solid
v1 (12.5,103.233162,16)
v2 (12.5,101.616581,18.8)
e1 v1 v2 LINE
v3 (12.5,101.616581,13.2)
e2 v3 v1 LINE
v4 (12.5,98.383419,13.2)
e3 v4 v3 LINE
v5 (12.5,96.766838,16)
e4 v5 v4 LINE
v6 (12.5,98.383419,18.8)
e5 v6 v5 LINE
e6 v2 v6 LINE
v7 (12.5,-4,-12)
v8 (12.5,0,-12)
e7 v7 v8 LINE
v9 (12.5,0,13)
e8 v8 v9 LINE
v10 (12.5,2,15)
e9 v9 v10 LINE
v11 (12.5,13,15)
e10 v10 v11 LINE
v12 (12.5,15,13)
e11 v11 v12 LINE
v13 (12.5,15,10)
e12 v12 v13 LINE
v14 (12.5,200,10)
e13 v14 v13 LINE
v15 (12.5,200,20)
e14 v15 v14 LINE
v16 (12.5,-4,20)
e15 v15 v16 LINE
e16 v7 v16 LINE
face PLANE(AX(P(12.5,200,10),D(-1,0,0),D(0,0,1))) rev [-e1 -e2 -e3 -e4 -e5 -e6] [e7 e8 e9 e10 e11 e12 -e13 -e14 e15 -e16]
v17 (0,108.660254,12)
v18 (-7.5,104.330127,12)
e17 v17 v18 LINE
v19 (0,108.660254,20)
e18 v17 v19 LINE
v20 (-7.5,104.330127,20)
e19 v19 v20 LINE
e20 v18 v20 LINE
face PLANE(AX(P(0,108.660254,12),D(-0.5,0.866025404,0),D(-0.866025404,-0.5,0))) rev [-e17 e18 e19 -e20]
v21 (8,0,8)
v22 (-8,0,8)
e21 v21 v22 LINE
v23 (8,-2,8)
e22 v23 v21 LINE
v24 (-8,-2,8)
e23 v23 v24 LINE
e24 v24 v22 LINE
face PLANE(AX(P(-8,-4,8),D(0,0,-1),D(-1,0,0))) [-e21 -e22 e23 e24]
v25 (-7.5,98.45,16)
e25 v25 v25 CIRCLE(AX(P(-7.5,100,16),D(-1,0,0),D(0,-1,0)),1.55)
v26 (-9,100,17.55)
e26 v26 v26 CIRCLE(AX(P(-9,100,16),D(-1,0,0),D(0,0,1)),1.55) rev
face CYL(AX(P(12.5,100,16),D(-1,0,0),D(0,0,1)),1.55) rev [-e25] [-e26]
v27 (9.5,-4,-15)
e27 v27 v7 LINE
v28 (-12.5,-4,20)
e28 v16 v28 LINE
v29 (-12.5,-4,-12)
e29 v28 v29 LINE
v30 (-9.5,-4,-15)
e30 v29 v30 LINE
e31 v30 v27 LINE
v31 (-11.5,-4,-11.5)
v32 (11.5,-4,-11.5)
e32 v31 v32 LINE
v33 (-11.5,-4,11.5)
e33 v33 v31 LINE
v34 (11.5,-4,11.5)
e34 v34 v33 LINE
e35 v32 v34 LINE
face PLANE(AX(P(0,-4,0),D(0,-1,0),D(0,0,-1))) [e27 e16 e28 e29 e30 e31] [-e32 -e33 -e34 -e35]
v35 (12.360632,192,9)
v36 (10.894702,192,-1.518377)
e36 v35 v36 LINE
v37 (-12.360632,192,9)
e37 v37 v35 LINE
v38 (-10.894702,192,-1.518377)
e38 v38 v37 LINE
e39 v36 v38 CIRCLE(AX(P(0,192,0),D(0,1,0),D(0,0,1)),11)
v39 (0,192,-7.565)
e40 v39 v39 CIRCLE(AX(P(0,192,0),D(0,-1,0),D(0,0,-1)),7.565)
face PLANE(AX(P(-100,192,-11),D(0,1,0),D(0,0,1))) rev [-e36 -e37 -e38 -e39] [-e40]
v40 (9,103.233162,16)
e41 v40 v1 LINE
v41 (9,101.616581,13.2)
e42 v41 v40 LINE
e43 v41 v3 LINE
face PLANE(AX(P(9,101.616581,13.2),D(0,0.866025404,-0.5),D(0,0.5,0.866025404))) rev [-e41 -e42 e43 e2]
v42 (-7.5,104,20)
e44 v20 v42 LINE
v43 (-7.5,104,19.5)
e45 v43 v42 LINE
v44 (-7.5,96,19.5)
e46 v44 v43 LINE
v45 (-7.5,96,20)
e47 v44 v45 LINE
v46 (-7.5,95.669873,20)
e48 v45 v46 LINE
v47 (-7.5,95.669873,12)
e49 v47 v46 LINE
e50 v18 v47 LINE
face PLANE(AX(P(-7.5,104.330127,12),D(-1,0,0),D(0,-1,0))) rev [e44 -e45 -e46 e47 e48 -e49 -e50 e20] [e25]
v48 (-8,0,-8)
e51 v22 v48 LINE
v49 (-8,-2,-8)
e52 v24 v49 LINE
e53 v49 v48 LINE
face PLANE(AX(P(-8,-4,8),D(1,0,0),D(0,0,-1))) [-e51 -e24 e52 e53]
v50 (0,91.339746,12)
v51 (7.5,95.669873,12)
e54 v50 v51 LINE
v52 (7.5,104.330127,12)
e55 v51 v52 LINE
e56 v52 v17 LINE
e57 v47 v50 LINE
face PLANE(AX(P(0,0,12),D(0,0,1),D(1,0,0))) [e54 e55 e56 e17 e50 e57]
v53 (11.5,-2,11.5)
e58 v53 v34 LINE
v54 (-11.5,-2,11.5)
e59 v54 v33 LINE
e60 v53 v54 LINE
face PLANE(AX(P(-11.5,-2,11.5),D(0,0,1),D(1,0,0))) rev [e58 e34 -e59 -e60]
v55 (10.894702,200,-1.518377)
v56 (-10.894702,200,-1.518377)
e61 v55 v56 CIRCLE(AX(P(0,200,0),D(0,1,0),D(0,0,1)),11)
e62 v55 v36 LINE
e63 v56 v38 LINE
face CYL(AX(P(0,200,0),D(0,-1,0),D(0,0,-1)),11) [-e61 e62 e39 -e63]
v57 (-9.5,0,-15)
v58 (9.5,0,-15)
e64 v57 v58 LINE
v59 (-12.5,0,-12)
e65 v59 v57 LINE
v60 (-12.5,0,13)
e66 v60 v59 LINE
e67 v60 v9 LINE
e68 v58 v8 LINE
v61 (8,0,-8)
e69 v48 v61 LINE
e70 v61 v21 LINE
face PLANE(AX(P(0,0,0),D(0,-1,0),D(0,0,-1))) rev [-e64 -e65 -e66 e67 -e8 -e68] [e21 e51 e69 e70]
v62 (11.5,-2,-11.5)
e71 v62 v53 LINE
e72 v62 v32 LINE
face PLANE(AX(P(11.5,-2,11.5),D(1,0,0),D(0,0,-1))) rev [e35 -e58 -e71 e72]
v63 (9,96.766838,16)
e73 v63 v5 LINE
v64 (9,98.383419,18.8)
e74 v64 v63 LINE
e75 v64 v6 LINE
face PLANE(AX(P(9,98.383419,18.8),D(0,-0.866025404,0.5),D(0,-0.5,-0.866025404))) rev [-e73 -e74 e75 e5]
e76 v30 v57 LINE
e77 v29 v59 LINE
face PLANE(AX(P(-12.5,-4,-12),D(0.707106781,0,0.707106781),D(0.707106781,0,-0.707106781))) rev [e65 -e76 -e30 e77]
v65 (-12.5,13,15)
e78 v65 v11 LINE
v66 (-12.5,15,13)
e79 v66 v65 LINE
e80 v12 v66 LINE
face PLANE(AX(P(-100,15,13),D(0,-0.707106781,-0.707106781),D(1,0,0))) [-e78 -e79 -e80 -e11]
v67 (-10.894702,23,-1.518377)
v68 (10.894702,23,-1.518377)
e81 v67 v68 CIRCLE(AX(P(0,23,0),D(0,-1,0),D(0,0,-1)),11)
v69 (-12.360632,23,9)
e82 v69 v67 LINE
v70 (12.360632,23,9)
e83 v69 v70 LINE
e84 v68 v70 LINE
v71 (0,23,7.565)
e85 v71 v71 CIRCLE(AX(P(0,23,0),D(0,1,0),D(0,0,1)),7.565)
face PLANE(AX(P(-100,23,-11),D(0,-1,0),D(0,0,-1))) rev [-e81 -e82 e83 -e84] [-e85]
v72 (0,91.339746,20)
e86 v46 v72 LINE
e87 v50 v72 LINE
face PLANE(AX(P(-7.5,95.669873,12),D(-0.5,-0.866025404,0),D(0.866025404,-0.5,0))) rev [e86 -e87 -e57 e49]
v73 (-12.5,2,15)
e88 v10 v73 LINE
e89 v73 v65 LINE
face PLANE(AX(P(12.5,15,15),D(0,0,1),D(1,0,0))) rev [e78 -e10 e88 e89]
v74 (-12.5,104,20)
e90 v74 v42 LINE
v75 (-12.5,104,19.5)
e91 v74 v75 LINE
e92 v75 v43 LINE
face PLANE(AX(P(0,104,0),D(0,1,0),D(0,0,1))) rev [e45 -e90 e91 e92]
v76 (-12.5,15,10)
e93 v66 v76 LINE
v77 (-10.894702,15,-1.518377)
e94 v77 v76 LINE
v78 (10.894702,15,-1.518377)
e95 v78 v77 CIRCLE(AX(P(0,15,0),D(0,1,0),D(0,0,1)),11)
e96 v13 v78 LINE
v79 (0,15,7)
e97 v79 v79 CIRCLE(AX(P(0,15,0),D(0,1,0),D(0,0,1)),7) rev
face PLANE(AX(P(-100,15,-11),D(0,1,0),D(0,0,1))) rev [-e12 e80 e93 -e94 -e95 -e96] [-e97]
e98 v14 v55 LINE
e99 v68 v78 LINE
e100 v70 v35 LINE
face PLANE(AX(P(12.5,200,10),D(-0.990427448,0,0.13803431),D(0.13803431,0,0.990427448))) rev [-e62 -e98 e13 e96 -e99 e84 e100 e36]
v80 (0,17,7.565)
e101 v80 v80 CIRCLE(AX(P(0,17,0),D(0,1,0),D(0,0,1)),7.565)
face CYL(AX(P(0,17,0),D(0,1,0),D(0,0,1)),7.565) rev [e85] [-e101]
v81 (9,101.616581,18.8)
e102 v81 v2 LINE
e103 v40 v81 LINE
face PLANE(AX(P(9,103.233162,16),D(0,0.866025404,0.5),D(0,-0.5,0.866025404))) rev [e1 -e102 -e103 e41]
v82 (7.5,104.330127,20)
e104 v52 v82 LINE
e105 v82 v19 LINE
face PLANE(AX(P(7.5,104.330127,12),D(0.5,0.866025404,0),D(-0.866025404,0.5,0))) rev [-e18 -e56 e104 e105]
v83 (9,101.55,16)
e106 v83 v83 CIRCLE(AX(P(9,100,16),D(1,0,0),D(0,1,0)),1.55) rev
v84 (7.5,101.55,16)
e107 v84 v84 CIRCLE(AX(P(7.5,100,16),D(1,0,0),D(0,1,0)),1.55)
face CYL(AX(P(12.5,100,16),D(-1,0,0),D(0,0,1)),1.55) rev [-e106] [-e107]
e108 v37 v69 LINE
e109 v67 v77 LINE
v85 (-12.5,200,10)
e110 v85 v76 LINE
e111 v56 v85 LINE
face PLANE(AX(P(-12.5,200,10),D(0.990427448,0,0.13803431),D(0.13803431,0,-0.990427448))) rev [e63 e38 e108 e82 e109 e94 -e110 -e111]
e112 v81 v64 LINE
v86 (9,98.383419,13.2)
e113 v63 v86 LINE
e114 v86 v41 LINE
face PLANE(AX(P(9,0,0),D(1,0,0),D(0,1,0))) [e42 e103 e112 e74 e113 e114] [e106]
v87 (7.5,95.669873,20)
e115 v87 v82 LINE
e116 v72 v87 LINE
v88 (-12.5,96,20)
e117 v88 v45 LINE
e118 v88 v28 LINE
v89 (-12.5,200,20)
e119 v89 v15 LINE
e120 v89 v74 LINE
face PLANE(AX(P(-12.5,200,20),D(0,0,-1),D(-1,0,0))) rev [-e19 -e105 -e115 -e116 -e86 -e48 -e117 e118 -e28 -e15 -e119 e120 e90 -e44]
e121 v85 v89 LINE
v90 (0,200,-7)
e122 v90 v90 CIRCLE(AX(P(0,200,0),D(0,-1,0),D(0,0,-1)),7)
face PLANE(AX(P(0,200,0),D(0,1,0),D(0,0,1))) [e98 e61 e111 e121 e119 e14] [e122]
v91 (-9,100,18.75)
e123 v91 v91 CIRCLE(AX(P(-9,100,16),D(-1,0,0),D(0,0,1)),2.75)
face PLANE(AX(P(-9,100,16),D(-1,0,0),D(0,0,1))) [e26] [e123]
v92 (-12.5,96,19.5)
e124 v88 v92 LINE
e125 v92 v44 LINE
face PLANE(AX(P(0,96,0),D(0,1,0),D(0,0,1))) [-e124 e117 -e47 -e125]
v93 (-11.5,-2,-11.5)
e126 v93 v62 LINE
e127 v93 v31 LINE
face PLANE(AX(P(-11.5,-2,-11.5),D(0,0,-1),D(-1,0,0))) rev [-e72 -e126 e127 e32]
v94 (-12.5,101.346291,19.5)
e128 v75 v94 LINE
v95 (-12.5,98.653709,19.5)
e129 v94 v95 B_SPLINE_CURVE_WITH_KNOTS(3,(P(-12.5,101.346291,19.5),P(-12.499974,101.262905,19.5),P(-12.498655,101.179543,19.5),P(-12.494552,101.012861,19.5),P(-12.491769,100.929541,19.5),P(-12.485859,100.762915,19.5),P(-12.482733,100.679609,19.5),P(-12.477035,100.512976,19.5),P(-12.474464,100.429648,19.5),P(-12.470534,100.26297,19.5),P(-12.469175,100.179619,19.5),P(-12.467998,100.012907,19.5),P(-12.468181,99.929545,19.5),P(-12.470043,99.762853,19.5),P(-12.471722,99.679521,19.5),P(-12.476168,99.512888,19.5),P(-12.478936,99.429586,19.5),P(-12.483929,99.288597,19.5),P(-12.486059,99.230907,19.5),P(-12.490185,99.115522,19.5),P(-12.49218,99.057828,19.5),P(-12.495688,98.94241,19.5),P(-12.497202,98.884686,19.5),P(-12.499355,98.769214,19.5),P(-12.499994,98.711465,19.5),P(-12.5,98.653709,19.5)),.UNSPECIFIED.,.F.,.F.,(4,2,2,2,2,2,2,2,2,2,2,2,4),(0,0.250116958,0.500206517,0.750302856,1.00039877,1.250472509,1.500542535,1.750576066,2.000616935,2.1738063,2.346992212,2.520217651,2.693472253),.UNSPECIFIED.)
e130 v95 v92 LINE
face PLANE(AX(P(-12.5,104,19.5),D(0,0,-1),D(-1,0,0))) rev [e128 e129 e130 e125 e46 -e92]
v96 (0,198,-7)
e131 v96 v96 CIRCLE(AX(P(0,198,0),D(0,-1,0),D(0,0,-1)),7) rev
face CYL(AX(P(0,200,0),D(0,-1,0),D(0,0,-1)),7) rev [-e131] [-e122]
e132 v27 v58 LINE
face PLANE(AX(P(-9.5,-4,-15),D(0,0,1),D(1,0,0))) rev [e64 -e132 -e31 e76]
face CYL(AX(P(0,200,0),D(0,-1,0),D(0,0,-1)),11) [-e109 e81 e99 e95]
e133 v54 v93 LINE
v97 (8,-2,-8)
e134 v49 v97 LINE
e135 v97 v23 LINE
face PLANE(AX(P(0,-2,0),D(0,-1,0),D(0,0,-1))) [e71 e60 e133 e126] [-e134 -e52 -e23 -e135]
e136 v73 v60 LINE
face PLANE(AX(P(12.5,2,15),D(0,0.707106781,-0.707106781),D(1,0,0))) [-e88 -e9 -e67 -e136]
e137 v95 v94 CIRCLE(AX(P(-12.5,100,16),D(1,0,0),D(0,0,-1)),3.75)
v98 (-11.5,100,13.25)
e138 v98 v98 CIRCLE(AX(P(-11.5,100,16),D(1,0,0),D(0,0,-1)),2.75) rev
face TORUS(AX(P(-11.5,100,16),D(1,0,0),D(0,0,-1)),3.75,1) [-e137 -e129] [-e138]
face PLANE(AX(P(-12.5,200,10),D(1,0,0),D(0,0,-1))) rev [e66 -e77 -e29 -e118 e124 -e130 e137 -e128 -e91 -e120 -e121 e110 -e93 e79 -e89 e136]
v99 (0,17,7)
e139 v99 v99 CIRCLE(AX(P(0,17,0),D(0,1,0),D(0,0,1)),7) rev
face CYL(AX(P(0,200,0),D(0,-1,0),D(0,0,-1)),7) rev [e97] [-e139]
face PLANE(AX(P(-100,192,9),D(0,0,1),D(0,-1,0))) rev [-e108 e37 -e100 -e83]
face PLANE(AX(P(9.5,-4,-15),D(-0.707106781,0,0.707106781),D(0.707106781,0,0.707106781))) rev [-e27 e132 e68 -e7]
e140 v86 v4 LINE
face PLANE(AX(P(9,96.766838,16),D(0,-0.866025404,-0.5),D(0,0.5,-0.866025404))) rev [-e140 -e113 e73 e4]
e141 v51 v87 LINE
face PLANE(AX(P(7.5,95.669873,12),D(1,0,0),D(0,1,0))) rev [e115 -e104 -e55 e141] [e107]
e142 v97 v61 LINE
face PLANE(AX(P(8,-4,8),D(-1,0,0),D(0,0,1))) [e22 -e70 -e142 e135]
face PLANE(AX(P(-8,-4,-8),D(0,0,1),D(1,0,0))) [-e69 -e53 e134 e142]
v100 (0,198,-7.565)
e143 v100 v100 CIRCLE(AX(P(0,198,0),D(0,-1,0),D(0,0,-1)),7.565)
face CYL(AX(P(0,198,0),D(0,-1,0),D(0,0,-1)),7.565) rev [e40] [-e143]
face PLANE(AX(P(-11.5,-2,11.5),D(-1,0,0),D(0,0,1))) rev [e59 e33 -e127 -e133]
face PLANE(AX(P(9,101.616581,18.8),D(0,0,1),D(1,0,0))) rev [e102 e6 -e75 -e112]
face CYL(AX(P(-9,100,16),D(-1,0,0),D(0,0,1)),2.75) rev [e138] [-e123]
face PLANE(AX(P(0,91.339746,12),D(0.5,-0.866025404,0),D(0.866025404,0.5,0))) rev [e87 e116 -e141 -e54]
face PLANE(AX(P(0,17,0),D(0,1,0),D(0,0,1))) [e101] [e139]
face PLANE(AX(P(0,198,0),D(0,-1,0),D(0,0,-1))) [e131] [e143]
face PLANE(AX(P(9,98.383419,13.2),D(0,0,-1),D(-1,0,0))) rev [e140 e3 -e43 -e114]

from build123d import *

# Parameters (mm, degrees)
BOSS_EXTRUDE1_DEPTH = 200
SKETCH4_R           = 7
CUT_EXTRUDE2_DEPTH  = 200
SKETCH3_W           = 20
SKETCH3_H           = 169
SKETCH3_W_2         = 21
SKETCH3_H_2         = 15
CUT_EXTRUDE1_DEPTH  = 100
SKETCH5_R           = 7.565
CUT_EXTRUDE3_DEPTH  = 6
CUT_EXTRUDE4_START  = -6
SKETCH6_R           = 7.565
CUT_EXTRUDE4_DEPTH  = 6
CUT_EXTRUDE8_START  = -100
SKETCH11_W          = 7
SKETCH11_H          = 2
CUT_EXTRUDE8_DEPTH  = 4
SKETCH13_W          = 16
SKETCH13_H          = 16
BOSS_EXTRUDE3_DEPTH = 4
SKETCH14_W          = 5
SKETCH14_H          = 15
CUT_EXTRUDE11_DEPTH = 203.546291005
CHAMFER1_SIZE       = 2
SKETCH15_W          = 23
SKETCH15_H          = 23
CUT_EXTRUDE12_DEPTH = 2
CUT_EXTRUDE13_DEPTH = 8
SKETCH17_R          = 1.55
CUT_EXTRUDE14_DEPTH = 203.546291005
SKETCH18_R          = 2.75
CUT_EXTRUDE15_DEPTH = 3.5
CUT_EXTRUDE16_DEPTH = 3.5
FILLET2_R           = 1


with BuildPart() as part:
    # Sketch1 → Boss-Extrude1 (new body)
    with BuildSketch(Plane(origin=(0, 0, 0), x_dir=(1, 0, 0), z_dir=(0, 1, 0))):
        with BuildLine():
            Line((-12.5, -10), (-10.894701926, 1.518377407))
            ThreePointArc((-10.894701926, 1.518377407), (0, 11), (10.894701926, 1.518377407))
            Line((10.894701926, 1.518377407), (12.5, -10))
            Line((12.5, -10), (12.5, -20))
            Line((12.5, -20), (-12.5, -20))
            Line((-12.5, -20), (-12.5, -10))
        make_face()
    extrude(amount=BOSS_EXTRUDE1_DEPTH)

    # Sketch4 → Cut-Extrude2 (cut)
    with BuildSketch(Plane.XZ):
        with Locations(Location((0, 0, 0), (0, 0, 270))):
            Circle(SKETCH4_R)
    extrude(amount=-CUT_EXTRUDE2_DEPTH, mode=Mode.SUBTRACT)

    # Sketch3 → Cut-Extrude1 (cut, symmetric)
    with BuildSketch(Plane(origin=(0, 0, 0), x_dir=(0, 0, -1), z_dir=(1, 0, 0))):
        with Locations((1, 107.5)):
            Rectangle(SKETCH3_W, SKETCH3_H)
        with Locations((0.5, 7.5)):
            Rectangle(SKETCH3_W_2, SKETCH3_H_2)
    extrude(amount=CUT_EXTRUDE1_DEPTH, both=True, mode=Mode.SUBTRACT)

    # Sketch5 → Cut-Extrude3 (cut)
    with BuildSketch(Plane.XZ.offset(-192)):
        with Locations(Location((0, 0, 0), (0, 0, 270))):
            Circle(SKETCH5_R)
    extrude(amount=-CUT_EXTRUDE3_DEPTH, mode=Mode.SUBTRACT)

    # Sketch6 → Cut-Extrude4 (cut)
    with BuildSketch(Plane(origin=(0, 23, 0), x_dir=(1, 0, 0), z_dir=(0, 1, 0)).offset(CUT_EXTRUDE4_START)):
        with Locations(Location((0, 0, 0), (0, 0, 90))):
            Circle(SKETCH6_R)
    extrude(amount=CUT_EXTRUDE4_DEPTH, mode=Mode.SUBTRACT)

    # Sketch11 → Cut-Extrude8 (cut, symmetric)
    with BuildSketch(Plane.XZ.offset(CUT_EXTRUDE8_START)):
        with Locations((-9, 20.5)):
            Rectangle(SKETCH11_W, SKETCH11_H)
    extrude(amount=CUT_EXTRUDE8_DEPTH, both=True, mode=Mode.SUBTRACT)

    # Sketch13 → Boss-Extrude3 (add)
    with BuildSketch(Plane.XZ):
        Polygon((-12.5, 20), (12.5, 20), (12.5, -12), (9.5, -15), (-9.5, -15), (-12.5, -12), align=None)
        Rectangle(SKETCH13_W, SKETCH13_H, mode=Mode.SUBTRACT)
    extrude(amount=BOSS_EXTRUDE3_DEPTH)

    # Sketch14 → Cut-Extrude11 (cut, through all)
    with BuildSketch(Plane.ZY.offset(12.5)):
        with Locations((12.5, 7.5)):
            Rectangle(SKETCH14_W, SKETCH14_H)
    extrude(amount=-CUT_EXTRUDE11_DEPTH, mode=Mode.SUBTRACT)

    # Chamfer1
    chamfer1_edges = [part.edges().sort_by_distance(p)[0] for p in [
        (0, 15, 15),
        (0, 0, 15),
    ]]
    chamfer(chamfer1_edges, length=CHAMFER1_SIZE)

    # Sketch15 → Cut-Extrude12 (cut)
    with BuildSketch(Plane.XZ.offset(4)):
        Rectangle(SKETCH15_W, SKETCH15_H)
    extrude(amount=-CUT_EXTRUDE12_DEPTH, mode=Mode.SUBTRACT)

    # Sketch16 → Cut-Extrude13 (cut)
    with BuildSketch(Plane.XY.offset(20)):
        Polygon((0, 108.660254038), (-7.5, 104.330127019), (-7.5, 95.669872981), (0, 91.339745962), (7.5, 95.669872981), (7.5, 104.330127019), align=None)
    extrude(amount=-CUT_EXTRUDE13_DEPTH, mode=Mode.SUBTRACT)

    # Sketch17 → Cut-Extrude14 (cut, through all)
    with BuildSketch(Plane.ZY.offset(12.5)):
        with Locations((16, 100)):
            Circle(SKETCH17_R)
    extrude(amount=-CUT_EXTRUDE14_DEPTH, mode=Mode.SUBTRACT)

    # Sketch18 → Cut-Extrude15 (cut)
    with BuildSketch(Plane.ZY.offset(12.5)):
        with Locations((16, 100)):
            Circle(SKETCH18_R)
    extrude(amount=-CUT_EXTRUDE15_DEPTH, mode=Mode.SUBTRACT)

    # Sketch19 → Cut-Extrude16 (cut)
    with BuildSketch(Plane(origin=(12.5, 0, 0), x_dir=(0, 0, -1), z_dir=(1, 0, 0))):
        Polygon((-16, 103.233161507), (-18.8, 101.616580754), (-18.8, 98.383419246), (-16, 96.766838493), (-13.2, 98.383419246), (-13.2, 101.616580754), align=None)
    extrude(amount=-CUT_EXTRUDE16_DEPTH, mode=Mode.SUBTRACT)

    # Fillet2
    # the kernel refuses this fillet: 1 mm, written as the material it takes off along each edge
    with BuildSketch(Plane(origin=(-12.5, 100, 16), x_dir=(0, 0, 1), z_dir=(0, -1, 0))) as fillet2_piece_1:
        with BuildLine():
            CenterArc((2.75 + FILLET2_R, -FILLET2_R), FILLET2_R, 90, 90)
            Line((2.75, -FILLET2_R), (2.75, 0))
            Line((2.75, 0), (2.75 + FILLET2_R, 0))
        make_face()
    revolve(axis=Axis((-12.5, 100, 16), (-1, 0, 0)), mode=Mode.SUBTRACT)


solid = part.part
